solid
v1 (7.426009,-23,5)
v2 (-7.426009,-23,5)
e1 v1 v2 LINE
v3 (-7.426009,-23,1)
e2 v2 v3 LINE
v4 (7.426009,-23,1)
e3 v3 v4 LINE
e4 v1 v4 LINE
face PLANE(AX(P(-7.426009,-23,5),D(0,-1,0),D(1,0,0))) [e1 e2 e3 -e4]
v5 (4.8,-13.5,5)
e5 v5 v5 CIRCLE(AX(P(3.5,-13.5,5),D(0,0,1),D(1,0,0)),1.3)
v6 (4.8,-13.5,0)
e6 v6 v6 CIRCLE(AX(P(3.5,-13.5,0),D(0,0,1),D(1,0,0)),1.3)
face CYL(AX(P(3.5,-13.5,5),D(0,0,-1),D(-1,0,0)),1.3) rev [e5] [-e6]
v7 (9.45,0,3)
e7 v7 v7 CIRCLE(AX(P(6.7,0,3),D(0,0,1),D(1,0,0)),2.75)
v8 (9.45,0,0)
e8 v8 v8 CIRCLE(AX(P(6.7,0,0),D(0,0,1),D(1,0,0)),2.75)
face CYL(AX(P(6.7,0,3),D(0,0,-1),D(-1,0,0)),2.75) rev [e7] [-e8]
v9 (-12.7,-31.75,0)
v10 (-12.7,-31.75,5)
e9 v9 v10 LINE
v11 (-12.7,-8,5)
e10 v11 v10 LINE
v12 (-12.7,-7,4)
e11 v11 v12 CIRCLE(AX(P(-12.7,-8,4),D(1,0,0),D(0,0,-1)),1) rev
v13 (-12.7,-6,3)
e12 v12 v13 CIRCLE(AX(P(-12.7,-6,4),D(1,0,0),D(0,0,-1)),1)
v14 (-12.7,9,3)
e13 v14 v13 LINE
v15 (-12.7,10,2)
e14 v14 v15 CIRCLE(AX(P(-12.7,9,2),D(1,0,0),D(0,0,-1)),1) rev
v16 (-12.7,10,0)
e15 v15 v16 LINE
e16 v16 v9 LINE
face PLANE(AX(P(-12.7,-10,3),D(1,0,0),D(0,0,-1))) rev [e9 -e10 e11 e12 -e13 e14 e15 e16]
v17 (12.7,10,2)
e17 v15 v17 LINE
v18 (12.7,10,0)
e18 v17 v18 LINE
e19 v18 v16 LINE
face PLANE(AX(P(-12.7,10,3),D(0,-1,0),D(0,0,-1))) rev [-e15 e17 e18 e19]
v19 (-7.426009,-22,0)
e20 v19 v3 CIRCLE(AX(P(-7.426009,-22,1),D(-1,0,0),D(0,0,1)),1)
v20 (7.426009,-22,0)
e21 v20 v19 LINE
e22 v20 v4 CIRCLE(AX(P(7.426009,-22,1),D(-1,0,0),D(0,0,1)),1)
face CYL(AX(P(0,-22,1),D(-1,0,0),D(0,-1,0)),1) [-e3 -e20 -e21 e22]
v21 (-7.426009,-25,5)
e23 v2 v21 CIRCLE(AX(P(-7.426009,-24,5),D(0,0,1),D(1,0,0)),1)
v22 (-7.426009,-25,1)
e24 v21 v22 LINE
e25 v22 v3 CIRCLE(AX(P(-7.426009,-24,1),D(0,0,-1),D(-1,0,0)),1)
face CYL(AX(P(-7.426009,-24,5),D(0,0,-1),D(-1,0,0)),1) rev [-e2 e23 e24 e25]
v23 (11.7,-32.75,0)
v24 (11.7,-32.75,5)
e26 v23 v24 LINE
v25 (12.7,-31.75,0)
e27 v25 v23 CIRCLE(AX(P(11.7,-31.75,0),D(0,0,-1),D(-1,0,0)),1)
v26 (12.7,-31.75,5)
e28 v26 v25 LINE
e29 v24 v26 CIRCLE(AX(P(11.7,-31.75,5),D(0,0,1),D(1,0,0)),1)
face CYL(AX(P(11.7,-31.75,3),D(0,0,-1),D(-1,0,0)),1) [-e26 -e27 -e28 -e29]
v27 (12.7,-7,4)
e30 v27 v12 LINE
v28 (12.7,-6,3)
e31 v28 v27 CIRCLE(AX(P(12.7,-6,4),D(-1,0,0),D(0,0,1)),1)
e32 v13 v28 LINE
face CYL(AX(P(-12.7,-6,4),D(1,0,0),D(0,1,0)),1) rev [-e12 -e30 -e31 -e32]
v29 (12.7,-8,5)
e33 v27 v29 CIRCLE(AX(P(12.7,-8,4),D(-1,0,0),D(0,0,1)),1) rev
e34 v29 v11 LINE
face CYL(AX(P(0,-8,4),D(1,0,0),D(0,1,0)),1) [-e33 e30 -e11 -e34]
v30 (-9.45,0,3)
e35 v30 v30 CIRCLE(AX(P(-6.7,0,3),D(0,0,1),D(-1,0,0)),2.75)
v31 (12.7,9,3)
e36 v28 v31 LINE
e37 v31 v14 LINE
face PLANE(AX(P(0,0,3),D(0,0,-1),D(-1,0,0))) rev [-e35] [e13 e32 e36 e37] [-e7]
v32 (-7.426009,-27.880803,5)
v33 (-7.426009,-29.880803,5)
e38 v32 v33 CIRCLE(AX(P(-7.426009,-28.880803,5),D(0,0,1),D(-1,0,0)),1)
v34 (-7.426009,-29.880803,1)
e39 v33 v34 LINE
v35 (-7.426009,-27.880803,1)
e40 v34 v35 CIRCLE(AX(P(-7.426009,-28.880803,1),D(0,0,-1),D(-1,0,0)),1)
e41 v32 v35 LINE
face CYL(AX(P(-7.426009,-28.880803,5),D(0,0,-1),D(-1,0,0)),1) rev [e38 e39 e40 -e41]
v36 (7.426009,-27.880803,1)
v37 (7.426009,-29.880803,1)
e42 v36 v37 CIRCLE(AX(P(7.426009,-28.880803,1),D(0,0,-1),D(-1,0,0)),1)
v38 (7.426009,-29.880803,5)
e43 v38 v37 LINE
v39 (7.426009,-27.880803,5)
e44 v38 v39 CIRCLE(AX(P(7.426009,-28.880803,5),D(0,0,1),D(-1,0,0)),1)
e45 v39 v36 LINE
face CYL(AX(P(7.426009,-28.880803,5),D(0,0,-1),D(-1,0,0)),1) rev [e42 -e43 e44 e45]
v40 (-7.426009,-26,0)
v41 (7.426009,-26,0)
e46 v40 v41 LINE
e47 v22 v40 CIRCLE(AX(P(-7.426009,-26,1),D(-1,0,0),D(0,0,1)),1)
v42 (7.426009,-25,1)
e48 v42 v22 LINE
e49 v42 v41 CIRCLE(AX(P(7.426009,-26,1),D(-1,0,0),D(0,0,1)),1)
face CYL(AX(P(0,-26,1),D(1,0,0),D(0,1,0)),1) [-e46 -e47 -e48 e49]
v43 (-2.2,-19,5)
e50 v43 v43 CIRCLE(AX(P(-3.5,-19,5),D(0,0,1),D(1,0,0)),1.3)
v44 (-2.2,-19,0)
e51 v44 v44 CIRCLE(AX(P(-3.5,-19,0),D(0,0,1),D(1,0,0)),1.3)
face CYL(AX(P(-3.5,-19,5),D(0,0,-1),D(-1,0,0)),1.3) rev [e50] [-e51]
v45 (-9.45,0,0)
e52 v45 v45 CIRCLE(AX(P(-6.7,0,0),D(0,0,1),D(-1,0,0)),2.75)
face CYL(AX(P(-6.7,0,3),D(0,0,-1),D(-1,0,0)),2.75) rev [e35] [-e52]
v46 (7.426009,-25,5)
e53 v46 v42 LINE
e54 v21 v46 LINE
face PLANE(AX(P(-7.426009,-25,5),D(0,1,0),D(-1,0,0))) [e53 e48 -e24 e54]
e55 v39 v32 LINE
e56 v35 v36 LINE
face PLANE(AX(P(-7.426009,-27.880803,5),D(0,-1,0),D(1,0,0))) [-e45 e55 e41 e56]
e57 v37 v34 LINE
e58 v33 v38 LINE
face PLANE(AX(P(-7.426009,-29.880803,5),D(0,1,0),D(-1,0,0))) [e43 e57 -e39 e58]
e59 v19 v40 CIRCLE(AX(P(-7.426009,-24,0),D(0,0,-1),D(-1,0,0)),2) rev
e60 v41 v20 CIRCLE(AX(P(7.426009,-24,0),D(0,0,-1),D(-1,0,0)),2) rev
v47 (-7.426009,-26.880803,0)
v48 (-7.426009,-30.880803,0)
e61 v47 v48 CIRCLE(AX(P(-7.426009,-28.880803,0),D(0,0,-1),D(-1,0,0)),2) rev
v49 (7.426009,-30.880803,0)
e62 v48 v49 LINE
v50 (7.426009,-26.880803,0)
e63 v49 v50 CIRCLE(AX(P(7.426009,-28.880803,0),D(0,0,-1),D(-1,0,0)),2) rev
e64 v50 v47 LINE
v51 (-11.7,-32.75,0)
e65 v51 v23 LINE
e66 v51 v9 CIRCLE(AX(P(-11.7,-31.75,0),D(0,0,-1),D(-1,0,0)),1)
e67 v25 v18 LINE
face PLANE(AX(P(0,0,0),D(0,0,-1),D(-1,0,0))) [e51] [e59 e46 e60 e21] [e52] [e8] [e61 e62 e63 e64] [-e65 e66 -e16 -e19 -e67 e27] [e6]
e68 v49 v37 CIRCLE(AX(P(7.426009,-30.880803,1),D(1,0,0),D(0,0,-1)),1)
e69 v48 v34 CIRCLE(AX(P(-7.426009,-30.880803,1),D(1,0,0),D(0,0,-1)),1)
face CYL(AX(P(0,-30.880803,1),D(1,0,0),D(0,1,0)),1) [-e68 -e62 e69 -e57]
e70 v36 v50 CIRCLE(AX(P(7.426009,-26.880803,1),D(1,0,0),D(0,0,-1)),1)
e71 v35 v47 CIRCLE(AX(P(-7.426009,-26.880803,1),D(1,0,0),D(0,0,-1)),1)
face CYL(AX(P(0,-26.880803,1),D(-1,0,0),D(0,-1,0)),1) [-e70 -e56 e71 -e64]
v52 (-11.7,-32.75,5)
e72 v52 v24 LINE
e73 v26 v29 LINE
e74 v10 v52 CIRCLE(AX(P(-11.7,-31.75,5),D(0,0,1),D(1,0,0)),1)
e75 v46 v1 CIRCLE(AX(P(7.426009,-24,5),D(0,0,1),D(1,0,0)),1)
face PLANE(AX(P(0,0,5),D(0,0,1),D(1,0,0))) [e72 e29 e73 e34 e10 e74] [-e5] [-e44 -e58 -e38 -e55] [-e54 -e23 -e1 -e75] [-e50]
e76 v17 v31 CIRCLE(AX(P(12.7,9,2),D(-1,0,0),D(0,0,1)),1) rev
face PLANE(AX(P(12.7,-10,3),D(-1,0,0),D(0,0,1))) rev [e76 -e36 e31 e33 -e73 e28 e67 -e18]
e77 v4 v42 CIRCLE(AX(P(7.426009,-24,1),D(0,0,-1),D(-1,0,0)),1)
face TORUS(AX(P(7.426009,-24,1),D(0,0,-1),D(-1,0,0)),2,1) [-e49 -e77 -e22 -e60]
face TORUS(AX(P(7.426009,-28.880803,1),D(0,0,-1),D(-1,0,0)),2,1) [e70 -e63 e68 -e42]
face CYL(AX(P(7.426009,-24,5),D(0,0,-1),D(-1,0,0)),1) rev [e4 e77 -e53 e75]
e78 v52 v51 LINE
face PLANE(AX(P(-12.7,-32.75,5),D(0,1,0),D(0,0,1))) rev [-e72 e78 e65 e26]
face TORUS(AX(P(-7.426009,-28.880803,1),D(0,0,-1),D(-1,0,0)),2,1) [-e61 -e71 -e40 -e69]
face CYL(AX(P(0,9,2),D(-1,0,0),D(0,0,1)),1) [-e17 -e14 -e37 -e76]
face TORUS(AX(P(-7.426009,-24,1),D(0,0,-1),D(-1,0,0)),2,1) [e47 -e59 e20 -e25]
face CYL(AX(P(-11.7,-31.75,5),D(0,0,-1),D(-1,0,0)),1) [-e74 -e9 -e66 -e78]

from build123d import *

# Parameters (mm, degrees)
SKETCH1_W           = 25.4
SKETCH1_H           = 20
SKETCH1_R           = 2.75
BOSS_EXTRUDE1_DEPTH = 3
SKETCH2_W           = 25.4
SKETCH2_H           = 25.75
SKETCH2_R           = 1.3
BOSS_EXTRUDE2_DEPTH = 5
FILLET1_R           = 1
FILLET2_R           = 1


with BuildPart() as part:
    # Sketch1 → Boss-Extrude1 (new body)
    with BuildSketch(Plane.XY):
        Rectangle(SKETCH1_W, SKETCH1_H)
        with Locations((6.7, 0)):
            Circle(SKETCH1_R, mode=Mode.SUBTRACT)
        with Locations(Location((-6.7, 0, 0), (0, 0, 180))):
            Circle(SKETCH1_R, mode=Mode.SUBTRACT)
    extrude(amount=BOSS_EXTRUDE1_DEPTH)

    # Sketch2 → Boss-Extrude2 (add)
    with BuildSketch(Plane.XY):
        with Locations((0, -19.875)):
            Rectangle(SKETCH2_W, SKETCH2_H)
        with Locations((-3.5, -19)):
            Circle(SKETCH2_R, mode=Mode.SUBTRACT)
        with Locations((3.5, -13.5)):
            Circle(SKETCH2_R, mode=Mode.SUBTRACT)
        with BuildLine():
            Line((-7.426009093, -23), (7.426009093, -23))
            ThreePointArc((7.426009093, -23), (8.426009093, -24), (7.426009093, -25))
            Line((7.426009093, -25), (-7.426009093, -25))
            ThreePointArc((-7.426009093, -25), (-8.426009093, -24), (-7.426009093, -23))
        make_face(mode=Mode.SUBTRACT)
        with BuildLine():
            Line((-7.426009093, -29.880803462), (7.426009093, -29.880803462))
            ThreePointArc((7.426009093, -29.880803462), (8.426009093, -28.880803462), (7.426009093, -27.880803462))
            Line((7.426009093, -27.880803462), (-7.426009093, -27.880803462))
            ThreePointArc((-7.426009093, -27.880803462), (-8.426009093, -28.880803462), (-7.426009093, -29.880803462))
        make_face(mode=Mode.SUBTRACT)
    extrude(amount=BOSS_EXTRUDE2_DEPTH)

    # Fillet1
    fillet1_edges = [part.edges().sort_by_distance(p)[0] for p in [
        (-8.426009093, -24, 0),
        (0, -25, 0),
        (8.426009093, -24, 0),
        (0, -23, 0),
        (-8.426009093, -28.880803462, 0),
        (0, -29.880803462, 0),
        (8.426009093, -28.880803462, 0),
        (0, -27.880803462, 0),
    ]]
    fillet(fillet1_edges, radius=FILLET1_R)

    # Fillet2
    fillet2_edges = [part.edges().sort_by_distance(p)[0] for p in [
        (0, 10, 3),
        (0, -7, 5),
        (0, -7, 3),
        (12.7, -32.75, 2.5),
        (-12.7, -32.75, 2.5),
    ]]
    fillet(fillet2_edges, radius=FILLET2_R - 0.0001)  # a hair under: the kernel refuses the full size


solid = part.part
